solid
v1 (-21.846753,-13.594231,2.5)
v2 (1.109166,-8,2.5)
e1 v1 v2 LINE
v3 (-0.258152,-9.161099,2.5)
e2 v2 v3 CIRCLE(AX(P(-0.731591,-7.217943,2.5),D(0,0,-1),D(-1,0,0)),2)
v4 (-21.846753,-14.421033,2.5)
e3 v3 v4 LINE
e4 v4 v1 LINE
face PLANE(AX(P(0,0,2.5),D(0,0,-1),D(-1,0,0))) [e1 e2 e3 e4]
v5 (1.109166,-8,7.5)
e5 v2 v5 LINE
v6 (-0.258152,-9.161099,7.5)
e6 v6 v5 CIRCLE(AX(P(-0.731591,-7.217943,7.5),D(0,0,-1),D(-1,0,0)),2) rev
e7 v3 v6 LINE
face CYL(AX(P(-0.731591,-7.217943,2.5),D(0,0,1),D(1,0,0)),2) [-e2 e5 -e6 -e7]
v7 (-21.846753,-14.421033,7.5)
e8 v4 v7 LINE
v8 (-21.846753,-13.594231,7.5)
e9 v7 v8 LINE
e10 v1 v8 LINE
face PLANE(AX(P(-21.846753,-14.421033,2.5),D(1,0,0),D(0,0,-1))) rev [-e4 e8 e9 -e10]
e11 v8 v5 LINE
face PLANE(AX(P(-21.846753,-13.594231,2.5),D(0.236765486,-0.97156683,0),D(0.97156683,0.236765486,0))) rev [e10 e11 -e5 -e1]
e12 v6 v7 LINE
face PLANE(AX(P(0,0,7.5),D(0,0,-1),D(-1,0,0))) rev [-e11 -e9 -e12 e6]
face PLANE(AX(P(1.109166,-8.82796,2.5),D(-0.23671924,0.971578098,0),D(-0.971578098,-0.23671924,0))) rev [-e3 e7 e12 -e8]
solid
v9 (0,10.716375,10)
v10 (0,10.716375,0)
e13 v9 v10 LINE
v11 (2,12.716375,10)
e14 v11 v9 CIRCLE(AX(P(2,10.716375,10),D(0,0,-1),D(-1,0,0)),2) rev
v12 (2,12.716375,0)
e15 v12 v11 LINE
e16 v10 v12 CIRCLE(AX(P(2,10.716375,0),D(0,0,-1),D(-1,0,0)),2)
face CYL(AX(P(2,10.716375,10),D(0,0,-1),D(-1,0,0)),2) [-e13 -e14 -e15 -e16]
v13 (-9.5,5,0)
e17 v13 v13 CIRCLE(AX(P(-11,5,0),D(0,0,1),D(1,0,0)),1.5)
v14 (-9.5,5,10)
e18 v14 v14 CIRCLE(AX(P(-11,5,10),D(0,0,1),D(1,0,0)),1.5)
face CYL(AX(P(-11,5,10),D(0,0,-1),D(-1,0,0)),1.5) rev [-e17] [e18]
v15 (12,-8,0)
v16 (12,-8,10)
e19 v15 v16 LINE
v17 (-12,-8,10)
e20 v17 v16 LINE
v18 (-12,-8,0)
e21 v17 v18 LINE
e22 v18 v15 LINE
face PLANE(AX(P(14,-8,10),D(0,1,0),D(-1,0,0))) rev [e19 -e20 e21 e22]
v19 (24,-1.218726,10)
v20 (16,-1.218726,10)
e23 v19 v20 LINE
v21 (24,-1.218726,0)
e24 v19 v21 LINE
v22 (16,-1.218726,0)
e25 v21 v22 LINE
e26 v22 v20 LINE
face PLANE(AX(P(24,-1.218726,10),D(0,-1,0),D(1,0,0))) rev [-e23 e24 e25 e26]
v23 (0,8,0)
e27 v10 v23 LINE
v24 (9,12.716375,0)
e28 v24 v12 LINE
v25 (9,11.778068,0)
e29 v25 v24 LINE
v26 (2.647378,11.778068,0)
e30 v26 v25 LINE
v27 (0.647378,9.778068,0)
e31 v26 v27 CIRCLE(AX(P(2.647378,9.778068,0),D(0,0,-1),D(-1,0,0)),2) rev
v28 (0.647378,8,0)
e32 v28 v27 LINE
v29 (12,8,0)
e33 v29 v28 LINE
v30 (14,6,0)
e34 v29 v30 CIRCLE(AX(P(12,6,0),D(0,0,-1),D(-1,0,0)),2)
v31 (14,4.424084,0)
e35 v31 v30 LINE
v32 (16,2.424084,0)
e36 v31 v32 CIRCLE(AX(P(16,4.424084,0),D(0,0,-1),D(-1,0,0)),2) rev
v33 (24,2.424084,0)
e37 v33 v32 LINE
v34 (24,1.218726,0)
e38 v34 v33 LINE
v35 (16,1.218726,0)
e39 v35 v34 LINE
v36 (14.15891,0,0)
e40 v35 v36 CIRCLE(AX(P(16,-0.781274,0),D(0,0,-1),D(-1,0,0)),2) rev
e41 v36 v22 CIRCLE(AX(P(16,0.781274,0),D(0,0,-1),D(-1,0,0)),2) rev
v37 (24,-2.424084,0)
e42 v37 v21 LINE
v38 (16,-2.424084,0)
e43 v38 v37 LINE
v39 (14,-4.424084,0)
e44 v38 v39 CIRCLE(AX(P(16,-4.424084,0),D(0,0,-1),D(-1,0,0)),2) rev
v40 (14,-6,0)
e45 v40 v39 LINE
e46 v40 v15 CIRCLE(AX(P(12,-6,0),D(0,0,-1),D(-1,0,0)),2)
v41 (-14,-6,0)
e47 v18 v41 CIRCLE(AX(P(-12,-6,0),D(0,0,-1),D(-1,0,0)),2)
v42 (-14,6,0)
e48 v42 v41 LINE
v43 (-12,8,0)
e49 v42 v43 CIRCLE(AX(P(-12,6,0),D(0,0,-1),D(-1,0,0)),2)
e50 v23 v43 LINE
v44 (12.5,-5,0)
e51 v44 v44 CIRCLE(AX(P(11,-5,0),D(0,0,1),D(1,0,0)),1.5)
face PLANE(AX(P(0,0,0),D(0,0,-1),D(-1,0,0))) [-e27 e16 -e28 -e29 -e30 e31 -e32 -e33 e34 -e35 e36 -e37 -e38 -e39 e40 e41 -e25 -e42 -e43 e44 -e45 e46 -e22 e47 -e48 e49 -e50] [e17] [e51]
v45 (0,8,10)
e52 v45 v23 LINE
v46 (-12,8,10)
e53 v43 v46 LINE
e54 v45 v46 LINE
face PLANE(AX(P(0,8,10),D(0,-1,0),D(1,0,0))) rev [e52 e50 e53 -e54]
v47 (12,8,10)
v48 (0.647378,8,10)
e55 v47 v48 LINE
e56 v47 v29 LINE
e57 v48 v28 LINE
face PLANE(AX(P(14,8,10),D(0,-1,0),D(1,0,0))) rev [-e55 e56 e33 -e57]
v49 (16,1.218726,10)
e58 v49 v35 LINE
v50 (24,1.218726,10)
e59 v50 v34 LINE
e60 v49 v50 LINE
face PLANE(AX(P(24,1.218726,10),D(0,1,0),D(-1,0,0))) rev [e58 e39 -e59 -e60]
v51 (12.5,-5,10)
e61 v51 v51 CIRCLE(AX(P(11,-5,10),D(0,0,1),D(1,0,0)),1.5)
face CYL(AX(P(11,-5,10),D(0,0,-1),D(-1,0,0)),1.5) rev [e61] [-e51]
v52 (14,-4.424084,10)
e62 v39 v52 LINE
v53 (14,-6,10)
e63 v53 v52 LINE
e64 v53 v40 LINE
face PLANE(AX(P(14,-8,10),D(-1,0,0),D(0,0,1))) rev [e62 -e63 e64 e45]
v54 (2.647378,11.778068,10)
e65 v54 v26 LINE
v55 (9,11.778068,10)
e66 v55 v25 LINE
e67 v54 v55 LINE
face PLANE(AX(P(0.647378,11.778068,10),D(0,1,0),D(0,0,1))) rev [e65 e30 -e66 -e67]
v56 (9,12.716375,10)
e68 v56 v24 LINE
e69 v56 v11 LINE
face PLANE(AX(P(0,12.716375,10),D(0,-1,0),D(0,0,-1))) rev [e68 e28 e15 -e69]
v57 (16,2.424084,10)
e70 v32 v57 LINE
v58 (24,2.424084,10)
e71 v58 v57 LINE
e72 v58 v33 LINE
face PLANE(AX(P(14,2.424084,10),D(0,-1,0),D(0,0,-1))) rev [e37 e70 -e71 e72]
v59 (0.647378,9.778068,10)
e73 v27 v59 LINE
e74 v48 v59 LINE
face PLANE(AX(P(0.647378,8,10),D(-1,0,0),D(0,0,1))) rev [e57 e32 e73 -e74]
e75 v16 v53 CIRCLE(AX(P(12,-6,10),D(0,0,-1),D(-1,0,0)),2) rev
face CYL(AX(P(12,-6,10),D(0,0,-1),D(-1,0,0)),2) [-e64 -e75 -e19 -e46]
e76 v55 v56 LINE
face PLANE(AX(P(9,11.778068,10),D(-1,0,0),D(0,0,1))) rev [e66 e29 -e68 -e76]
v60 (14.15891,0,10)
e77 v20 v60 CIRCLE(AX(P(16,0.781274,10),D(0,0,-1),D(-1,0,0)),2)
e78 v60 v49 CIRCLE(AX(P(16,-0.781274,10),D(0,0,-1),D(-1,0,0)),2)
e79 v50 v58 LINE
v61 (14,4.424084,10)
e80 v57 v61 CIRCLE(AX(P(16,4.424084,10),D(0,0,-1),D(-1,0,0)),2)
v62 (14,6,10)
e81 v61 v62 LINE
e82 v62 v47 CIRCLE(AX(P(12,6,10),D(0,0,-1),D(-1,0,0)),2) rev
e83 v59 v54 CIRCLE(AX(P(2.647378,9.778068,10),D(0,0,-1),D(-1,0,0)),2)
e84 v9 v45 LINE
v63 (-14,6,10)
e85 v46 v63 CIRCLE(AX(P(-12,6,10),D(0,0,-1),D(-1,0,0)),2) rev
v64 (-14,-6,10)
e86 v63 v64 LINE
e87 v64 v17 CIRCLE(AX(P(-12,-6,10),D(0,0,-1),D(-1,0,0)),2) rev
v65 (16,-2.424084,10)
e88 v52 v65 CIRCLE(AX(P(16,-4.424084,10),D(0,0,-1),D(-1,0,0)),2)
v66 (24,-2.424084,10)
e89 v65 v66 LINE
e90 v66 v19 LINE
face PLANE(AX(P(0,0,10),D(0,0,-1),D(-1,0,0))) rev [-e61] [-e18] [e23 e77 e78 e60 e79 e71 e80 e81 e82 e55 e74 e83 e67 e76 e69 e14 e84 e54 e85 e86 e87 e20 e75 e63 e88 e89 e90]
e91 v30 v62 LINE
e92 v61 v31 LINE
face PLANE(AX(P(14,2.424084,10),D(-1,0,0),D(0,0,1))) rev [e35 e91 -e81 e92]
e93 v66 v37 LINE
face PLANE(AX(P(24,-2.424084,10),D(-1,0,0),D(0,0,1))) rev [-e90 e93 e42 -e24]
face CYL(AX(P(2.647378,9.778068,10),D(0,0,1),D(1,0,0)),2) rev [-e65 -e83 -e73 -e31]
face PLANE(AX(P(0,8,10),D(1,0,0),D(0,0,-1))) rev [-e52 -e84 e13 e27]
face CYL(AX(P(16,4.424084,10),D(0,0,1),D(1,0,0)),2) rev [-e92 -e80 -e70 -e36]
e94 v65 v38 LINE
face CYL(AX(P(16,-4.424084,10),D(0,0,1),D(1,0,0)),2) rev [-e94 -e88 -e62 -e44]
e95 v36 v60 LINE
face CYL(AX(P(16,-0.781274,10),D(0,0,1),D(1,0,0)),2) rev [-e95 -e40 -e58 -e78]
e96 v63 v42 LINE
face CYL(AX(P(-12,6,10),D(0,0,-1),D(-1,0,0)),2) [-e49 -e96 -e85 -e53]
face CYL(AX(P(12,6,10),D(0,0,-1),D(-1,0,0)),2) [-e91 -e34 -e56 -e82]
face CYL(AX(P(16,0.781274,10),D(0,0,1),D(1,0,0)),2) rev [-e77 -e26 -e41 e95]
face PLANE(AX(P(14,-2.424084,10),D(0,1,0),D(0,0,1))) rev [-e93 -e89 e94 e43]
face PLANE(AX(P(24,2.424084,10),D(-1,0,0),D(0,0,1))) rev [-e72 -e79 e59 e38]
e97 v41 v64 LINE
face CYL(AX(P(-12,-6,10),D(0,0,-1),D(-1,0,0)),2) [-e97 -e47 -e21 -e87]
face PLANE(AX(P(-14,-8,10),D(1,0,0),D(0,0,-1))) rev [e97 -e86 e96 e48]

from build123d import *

# Parameters (mm, degrees)
SKETCH2_R           = 1.5
BOSS_EXTRUDE1_DEPTH = 10
FILLET1_R           = 2
BOSS_EXTRUDE2_DEPTH = 2.5
FILLET2_R           = 2


with BuildPart() as part:
    # Sketch2 → Boss-Extrude1 (new body)
    with BuildSketch(Plane.XY):
        Polygon((0, 8), (0, 12.716374873), (9, 12.716374873), (9, 11.778068475), (0.647378108, 11.778068475), (0.647378108, 8), (14, 8), (14, 2.424084127), (24, 2.424084127), (24, 1.218725863), (14, 1.218725863), (14, -1.218725863), (24, -1.218725863), (24, -2.424084127), (14, -2.424084127), (14, -8), (3.483162405, -8), (-14, -8), (-14, 8), align=None)
        with Locations((-11, 5)):
            Circle(SKETCH2_R, mode=Mode.SUBTRACT)
        with Locations((11, -5)):
            Circle(SKETCH2_R, mode=Mode.SUBTRACT)
    extrude(amount=BOSS_EXTRUDE1_DEPTH)

    # Fillet1
    # the kernel refuses this fillet: 2 mm, written as the material it adds along each edge
    with BuildSketch(Plane(origin=(0.647378108, 11.778068475, 0), x_dir=(0, -1, 0), z_dir=(0, 0, 1)), Plane(origin=(14, 2.424084127, 0), x_dir=(1, 0, 0), z_dir=(0, 0, 1)), Plane(origin=(14, 1.218725863, 0), x_dir=(0, -1, 0), z_dir=(0, 0, 1)), Plane(origin=(14, -1.218725863, 0), x_dir=(1, 0, 0), z_dir=(0, 0, 1)), Plane(origin=(14, -2.424084127, 0), x_dir=(0, -1, 0), z_dir=(0, 0, 1))) as fillet1_piece_1:
        with BuildLine():
            CenterArc((FILLET1_R, FILLET1_R), FILLET1_R, 180, 90)
            Line((0, FILLET1_R), (0, 0))
            Line((0, 0), (FILLET1_R, 0))
        make_face()
    extrude(amount=10)
    # the kernel refuses this fillet: 2 mm, written as the material it takes off along each edge
    with BuildSketch(Plane(origin=(0, 12.716374873, -5), x_dir=(0, -1, 0), z_dir=(0, 0, 1)), Plane(origin=(14, 8, -5), x_dir=(-1, 0, 0), z_dir=(0, 0, 1)), Plane(origin=(14, -8, -5), x_dir=(0, 1, 0), z_dir=(0, 0, 1))) as fillet1_2_piece_1:
        with BuildLine():
            CenterArc((FILLET1_R, FILLET1_R), FILLET1_R, 180, 90)
            Line((0, FILLET1_R), (0, 0))
            Line((0, 0), (FILLET1_R, 0))
        make_face()
    extrude(amount=20, mode=Mode.SUBTRACT)
    with BuildSketch(Plane(origin=(-14, -8, -5), x_dir=(0, 1, 0), z_dir=(0, 0, 1)), Plane(origin=(-14, 8, -5), x_dir=(1, 0, 0), z_dir=(0, 0, 1))) as fillet1_2_piece_2:
        with BuildLine():
            CenterArc((FILLET1_R, -FILLET1_R), FILLET1_R, 90, 90)
            Line((0, -FILLET1_R), (0, 0))
            Line((0, 0), (FILLET1_R, 0))
        make_face()
    extrude(amount=20, mode=Mode.SUBTRACT)


with BuildPart() as body_2:
    # Sketch3 → Boss-Extrude2 (new, symmetric)
    with BuildSketch(Plane(origin=(0, 0, 5), x_dir=(-1, 0, 0), z_dir=(0, 0, -1))):
        Polygon((-1.109166196, -8), (-1.109166196, -8.82795975), (21.846753247, -14.421033343), (21.846753247, -13.594231159), align=None)
    extrude(amount=BOSS_EXTRUDE2_DEPTH, both=True)

    # Fillet2
    # the kernel refuses this fillet: 2 mm, written as the material it takes off along each edge
    with BuildSketch(Plane(origin=(1.109166196, -8.82795975, 11.018292786), x_dir=(0, 1, 0), z_dir=(0, 0, -1))) as fillet2_piece_1:
        with BuildLine():
            CenterArc((1.610017159, -1.840756966), FILLET2_R, 113.018523563, 53.28848865)
            Line((-0.333139038, -1.367318486), (-0.372002162, -1.357849716))
            Line((-0.372002162, -1.357849716), (-0.038863124, 0.00946877))
            Line((-0.038863124, 0.00946877), (0, 0.04))
            ThreePointArc((0, 0.04), (0.413979875, 0.04), (0.812318601, 0.036815139))
            Line((0.812318601, 0.036815139), (0.82795975, 0))
        make_face()
    extrude(amount=12.036585572, mode=Mode.SUBTRACT)


solid = Compound([part.part, body_2.part])
